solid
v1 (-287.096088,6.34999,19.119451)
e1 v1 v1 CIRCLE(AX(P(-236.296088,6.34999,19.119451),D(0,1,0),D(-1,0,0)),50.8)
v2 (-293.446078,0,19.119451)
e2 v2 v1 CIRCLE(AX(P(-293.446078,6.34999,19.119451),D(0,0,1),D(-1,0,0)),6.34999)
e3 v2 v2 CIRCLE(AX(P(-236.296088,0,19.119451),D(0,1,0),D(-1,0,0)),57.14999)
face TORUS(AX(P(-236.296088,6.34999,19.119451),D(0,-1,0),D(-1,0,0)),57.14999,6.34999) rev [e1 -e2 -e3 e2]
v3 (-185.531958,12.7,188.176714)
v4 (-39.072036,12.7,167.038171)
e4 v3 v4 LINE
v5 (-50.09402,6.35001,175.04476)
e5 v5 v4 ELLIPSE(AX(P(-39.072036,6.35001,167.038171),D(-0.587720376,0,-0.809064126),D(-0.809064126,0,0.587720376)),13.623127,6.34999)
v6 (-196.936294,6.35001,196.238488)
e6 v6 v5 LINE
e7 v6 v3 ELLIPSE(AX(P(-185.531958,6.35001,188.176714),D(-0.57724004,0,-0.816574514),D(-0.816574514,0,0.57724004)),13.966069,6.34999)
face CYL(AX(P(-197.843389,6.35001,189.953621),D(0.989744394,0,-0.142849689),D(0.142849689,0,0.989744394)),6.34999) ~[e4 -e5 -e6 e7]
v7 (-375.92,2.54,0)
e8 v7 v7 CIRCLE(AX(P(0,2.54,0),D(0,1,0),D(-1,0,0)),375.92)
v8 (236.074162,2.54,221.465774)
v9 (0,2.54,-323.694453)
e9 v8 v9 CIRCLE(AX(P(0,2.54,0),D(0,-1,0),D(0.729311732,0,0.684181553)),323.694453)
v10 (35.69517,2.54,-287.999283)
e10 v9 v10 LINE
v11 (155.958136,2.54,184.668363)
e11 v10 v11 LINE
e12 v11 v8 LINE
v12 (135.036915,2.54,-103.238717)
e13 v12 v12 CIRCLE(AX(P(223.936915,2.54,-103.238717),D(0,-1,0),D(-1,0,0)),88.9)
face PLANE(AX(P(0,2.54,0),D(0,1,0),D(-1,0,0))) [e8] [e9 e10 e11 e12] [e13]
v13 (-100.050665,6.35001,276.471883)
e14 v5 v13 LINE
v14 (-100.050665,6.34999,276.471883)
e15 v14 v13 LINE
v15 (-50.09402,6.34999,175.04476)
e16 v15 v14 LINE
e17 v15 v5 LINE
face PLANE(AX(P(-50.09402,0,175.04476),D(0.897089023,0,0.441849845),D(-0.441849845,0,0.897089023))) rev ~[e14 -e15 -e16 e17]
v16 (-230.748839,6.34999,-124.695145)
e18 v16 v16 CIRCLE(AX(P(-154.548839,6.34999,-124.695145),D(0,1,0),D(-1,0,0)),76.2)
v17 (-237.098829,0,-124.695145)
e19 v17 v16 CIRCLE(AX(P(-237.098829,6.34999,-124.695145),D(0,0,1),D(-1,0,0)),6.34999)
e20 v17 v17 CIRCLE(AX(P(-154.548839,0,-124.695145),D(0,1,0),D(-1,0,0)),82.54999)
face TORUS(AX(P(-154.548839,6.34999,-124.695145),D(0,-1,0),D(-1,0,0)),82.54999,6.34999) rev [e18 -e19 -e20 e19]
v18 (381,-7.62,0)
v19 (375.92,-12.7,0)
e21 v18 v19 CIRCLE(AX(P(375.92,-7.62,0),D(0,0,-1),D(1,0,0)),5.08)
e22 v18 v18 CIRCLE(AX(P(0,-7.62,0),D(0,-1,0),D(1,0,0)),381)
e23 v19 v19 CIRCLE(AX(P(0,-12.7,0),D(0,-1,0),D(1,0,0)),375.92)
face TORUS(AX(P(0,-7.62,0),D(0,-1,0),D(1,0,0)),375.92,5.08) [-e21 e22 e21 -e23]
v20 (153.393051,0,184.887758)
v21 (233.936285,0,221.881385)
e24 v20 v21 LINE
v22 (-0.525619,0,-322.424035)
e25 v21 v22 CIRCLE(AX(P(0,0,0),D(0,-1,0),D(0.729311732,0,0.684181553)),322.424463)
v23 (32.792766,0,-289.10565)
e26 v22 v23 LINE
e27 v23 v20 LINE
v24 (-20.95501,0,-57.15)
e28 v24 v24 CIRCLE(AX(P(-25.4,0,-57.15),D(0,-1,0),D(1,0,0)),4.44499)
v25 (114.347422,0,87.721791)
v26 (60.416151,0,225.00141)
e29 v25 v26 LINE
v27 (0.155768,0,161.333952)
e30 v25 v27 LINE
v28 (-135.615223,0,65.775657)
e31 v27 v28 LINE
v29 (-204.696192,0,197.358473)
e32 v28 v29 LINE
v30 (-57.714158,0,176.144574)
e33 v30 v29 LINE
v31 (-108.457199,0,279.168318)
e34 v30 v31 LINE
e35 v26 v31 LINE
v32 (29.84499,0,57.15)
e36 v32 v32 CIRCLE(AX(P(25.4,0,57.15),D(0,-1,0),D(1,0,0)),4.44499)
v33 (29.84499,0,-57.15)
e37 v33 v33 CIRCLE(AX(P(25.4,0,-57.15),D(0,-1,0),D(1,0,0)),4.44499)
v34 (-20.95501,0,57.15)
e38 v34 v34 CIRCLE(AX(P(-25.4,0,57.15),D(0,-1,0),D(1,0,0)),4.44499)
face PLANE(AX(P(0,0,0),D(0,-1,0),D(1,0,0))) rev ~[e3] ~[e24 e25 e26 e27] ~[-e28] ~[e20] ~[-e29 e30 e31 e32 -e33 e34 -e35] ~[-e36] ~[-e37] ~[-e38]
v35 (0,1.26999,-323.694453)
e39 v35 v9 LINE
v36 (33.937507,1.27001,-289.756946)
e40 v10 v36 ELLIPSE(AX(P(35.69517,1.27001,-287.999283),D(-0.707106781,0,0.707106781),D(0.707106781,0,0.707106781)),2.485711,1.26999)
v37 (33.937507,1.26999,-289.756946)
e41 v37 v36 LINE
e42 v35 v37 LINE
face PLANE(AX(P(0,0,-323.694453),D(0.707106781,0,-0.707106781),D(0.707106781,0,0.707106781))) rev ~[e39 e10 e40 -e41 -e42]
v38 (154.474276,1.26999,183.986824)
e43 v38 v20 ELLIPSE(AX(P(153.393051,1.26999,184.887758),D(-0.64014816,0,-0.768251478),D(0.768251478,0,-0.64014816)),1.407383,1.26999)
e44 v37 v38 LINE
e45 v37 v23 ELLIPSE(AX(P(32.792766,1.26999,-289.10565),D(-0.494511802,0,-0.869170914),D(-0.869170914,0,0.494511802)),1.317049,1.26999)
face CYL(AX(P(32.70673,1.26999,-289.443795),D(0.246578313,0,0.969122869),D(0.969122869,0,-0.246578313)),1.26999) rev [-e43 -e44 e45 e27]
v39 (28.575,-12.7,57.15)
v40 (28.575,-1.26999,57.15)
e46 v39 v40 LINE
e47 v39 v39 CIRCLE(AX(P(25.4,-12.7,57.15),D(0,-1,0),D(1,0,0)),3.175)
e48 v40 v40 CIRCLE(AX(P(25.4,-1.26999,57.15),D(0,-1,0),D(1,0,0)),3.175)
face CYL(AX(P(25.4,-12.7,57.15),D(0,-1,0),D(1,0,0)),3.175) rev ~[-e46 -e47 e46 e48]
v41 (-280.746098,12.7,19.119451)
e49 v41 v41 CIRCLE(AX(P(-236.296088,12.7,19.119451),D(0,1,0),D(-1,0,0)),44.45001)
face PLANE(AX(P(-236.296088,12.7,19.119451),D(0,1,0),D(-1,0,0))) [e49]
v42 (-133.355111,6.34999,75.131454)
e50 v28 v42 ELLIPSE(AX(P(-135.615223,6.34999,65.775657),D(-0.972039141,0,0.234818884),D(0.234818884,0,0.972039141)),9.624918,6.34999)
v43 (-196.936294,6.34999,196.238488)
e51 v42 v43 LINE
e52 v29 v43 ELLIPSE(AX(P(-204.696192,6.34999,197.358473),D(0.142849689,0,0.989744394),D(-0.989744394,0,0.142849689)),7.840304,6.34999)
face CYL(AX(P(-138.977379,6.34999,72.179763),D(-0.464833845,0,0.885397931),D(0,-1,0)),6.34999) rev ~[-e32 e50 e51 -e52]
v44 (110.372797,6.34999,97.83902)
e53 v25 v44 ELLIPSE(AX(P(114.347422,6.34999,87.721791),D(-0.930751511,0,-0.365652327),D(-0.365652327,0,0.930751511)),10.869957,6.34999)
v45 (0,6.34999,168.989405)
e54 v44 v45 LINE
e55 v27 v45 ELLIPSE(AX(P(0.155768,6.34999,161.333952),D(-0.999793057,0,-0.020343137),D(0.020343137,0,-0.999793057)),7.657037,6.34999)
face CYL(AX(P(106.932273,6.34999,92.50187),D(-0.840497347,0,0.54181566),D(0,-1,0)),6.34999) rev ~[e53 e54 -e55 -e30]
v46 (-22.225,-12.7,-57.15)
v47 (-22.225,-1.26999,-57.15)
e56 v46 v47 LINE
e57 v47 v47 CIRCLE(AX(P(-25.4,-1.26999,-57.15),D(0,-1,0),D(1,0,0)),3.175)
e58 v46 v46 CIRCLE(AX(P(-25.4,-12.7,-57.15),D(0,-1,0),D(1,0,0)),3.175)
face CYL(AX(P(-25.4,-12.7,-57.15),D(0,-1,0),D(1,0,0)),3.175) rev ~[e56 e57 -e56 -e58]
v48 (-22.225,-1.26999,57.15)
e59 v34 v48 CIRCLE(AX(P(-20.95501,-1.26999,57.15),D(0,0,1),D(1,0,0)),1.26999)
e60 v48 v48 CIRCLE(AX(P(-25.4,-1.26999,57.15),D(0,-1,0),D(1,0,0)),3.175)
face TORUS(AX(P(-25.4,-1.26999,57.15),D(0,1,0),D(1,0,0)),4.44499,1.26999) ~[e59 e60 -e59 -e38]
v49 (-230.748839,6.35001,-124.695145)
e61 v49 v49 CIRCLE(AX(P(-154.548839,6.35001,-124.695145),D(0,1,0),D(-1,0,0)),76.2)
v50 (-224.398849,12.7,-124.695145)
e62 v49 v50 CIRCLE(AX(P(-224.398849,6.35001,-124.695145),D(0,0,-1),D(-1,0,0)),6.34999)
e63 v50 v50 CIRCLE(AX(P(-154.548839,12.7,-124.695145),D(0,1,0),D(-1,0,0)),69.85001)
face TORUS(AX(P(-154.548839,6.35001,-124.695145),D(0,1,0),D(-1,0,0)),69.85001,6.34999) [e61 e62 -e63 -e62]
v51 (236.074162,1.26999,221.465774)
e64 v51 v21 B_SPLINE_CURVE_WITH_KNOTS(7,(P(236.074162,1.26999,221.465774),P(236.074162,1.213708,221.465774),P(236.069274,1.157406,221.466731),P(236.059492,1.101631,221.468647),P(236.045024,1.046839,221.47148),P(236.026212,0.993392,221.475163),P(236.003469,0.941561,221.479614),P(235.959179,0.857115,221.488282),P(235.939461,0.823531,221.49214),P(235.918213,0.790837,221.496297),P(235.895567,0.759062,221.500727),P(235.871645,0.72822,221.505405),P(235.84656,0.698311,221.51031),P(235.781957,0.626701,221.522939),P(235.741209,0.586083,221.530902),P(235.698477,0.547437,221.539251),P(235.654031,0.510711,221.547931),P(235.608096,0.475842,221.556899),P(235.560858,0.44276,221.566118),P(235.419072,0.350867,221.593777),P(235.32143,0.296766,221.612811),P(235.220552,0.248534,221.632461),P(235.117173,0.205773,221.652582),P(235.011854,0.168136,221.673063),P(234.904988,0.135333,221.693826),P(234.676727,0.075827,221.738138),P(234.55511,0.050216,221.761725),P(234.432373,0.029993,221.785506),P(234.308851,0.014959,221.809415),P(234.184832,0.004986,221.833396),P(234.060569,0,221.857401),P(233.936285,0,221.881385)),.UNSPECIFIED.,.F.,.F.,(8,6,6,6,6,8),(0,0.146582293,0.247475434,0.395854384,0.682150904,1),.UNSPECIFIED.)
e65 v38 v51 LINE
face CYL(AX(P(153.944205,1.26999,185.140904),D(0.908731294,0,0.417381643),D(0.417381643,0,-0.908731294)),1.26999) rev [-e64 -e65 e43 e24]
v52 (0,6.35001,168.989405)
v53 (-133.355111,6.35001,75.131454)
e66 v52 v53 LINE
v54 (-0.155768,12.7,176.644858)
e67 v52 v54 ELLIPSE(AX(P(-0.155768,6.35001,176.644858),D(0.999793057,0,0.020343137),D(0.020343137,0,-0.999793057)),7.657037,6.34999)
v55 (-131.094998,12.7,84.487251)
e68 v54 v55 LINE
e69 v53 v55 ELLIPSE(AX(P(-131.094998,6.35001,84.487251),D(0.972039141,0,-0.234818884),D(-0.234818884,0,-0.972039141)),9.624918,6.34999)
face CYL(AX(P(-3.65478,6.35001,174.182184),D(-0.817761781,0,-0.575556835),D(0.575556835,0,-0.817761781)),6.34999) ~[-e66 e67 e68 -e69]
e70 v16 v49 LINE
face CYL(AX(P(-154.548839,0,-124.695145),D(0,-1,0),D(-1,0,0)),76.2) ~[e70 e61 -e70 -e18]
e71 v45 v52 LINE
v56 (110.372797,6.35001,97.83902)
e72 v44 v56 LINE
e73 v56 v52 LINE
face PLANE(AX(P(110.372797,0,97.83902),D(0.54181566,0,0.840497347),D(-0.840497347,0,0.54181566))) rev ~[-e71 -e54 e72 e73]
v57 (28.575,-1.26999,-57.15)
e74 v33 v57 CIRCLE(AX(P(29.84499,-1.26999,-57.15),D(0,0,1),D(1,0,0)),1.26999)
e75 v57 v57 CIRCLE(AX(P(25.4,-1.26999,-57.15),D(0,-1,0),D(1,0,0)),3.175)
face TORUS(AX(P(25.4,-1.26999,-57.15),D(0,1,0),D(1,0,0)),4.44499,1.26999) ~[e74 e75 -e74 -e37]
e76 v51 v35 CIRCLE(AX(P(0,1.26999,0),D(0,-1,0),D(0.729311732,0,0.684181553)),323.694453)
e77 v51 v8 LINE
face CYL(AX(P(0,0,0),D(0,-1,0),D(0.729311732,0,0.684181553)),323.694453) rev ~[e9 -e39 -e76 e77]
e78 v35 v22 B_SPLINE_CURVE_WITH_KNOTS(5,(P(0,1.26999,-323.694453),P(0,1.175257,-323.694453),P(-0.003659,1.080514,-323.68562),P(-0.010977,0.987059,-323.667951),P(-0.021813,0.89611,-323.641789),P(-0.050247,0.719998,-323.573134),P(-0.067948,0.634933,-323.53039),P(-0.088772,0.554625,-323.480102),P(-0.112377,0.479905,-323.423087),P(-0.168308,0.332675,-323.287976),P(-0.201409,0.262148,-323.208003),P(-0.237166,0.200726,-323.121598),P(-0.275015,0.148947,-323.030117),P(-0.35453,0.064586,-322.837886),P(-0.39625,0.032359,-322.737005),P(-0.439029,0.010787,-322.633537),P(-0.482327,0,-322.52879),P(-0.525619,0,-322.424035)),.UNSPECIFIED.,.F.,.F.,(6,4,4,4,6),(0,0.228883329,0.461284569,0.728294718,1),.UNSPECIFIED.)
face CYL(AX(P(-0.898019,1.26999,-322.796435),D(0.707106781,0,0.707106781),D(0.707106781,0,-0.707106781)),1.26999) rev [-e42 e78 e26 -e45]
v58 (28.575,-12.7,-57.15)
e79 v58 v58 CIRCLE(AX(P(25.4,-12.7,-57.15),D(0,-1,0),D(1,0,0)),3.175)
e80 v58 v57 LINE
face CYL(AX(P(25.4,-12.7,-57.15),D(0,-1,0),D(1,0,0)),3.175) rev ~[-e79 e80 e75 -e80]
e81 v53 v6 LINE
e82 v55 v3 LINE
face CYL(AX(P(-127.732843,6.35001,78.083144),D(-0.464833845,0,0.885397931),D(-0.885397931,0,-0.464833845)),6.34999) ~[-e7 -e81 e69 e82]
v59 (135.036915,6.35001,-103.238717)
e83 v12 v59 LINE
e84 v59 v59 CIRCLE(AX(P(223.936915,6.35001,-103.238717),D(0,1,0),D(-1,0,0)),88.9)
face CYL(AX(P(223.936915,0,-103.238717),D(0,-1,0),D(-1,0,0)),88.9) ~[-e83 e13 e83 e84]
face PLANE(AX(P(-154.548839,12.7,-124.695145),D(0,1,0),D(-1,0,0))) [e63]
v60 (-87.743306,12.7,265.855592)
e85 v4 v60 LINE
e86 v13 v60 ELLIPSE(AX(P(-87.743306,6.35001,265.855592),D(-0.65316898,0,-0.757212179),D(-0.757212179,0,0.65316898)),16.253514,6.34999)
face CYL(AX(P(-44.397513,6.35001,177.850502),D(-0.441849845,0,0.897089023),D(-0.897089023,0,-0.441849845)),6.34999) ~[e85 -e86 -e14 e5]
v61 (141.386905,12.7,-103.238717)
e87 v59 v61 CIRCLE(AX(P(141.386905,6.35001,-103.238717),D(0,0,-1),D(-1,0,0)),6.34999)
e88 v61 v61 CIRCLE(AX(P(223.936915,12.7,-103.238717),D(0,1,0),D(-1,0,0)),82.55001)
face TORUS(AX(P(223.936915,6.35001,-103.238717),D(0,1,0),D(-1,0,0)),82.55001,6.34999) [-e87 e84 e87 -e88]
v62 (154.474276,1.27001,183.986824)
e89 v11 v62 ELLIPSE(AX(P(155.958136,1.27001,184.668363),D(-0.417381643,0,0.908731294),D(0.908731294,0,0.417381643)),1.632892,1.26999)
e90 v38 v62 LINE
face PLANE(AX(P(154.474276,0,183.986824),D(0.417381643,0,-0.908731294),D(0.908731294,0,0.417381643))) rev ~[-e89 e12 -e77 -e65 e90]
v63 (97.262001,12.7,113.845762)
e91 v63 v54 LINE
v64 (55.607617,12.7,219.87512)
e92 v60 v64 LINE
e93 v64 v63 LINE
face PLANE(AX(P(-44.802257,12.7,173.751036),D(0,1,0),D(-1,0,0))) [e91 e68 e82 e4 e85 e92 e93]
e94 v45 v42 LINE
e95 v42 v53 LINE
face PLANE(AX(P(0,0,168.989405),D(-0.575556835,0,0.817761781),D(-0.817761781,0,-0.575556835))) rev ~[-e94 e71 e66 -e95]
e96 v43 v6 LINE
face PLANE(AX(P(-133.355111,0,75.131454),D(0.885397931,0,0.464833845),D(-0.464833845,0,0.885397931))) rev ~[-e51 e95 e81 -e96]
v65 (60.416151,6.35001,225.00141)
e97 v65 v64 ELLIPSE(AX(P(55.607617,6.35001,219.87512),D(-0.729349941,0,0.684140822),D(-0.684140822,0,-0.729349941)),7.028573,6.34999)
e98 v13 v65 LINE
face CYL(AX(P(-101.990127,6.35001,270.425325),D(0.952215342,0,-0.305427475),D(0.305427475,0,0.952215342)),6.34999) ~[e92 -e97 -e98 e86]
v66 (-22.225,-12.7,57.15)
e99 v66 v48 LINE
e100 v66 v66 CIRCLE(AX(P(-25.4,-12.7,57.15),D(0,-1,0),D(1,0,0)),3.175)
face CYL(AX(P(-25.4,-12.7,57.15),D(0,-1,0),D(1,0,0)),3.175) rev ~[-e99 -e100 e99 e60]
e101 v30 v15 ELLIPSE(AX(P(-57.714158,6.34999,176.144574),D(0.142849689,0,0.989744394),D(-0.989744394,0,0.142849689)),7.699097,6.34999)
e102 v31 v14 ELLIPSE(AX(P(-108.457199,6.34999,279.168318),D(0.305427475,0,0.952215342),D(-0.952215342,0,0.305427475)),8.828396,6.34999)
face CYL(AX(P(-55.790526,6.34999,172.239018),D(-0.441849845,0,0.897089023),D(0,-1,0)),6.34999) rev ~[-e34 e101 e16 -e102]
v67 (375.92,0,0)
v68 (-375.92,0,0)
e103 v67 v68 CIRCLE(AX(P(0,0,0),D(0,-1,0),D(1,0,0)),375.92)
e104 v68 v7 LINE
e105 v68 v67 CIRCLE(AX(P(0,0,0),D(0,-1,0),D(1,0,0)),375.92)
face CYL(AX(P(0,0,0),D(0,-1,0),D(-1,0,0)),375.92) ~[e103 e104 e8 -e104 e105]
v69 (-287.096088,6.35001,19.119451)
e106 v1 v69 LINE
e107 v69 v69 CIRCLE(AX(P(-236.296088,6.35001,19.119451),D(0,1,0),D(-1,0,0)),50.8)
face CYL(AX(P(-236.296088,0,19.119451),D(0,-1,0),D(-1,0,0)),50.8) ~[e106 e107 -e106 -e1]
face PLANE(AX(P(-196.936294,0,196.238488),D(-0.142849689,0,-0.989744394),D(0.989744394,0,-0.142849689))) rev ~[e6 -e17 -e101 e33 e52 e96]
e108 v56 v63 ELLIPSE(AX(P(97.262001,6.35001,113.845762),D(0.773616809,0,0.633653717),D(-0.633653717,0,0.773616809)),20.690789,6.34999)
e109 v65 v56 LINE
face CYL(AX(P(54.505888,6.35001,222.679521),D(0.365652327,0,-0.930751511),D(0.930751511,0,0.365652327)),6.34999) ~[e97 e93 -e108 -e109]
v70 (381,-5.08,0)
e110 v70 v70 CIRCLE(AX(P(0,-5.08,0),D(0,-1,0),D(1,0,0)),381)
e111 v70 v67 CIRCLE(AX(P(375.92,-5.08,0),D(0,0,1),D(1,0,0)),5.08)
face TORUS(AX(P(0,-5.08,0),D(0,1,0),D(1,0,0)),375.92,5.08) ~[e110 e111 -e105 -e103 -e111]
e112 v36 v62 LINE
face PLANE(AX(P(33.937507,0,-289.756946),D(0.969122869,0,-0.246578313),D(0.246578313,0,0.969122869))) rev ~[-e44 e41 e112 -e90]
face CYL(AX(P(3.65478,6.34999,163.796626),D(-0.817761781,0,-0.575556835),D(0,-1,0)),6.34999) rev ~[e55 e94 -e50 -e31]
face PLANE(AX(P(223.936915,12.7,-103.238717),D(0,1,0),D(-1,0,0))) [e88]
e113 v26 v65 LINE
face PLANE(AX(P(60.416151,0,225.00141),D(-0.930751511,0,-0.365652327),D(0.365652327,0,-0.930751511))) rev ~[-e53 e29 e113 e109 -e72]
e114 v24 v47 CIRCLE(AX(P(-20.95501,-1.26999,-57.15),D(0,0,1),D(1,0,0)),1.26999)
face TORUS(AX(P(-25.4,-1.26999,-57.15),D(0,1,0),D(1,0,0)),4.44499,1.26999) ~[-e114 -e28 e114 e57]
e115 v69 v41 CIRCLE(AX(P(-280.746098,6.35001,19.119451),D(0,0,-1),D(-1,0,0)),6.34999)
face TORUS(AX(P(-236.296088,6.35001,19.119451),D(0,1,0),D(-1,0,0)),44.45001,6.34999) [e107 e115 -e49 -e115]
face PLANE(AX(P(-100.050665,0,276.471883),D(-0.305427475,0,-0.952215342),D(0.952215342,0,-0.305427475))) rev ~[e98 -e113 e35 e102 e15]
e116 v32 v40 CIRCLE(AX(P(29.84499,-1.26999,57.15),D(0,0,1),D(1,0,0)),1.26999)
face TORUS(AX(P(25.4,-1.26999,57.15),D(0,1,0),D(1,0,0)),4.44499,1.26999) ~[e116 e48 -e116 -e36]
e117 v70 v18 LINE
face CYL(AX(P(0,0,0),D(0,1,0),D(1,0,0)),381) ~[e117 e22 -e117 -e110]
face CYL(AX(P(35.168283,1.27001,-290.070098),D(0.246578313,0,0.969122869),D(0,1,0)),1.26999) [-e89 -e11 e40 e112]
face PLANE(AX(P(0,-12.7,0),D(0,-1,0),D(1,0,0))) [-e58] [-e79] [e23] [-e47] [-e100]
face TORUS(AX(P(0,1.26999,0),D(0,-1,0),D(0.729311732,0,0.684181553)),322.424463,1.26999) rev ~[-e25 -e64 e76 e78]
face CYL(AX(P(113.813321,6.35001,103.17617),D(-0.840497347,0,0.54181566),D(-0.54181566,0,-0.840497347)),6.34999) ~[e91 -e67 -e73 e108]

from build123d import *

# Parameters (mm, degrees)
F0_R     = 381
F1_DEPTH = 12.7
F2_R     = 5.08
F3_R     = 3.175
F4_DEPTH = 12.7
F5_R     = 375.92
F6_DEPTH = 2.54
F7_R     = 1.26999
F8_R     = 88.9
F8_R_2   = 50.8
F8_R_3   = 76.2
F9_DEPTH = 12.7
F10_R    = 6.34999


# Not quite as in the source:
# - a fillet or chamfer is up to 0.001 mm smaller than in the source, because OpenCascade refuses the exact size


with BuildPart() as f1:
    # F0 (on Front) → F1 (new body)
    with BuildSketch(Plane.XZ):
        Circle(F0_R)
    extrude(amount=F1_DEPTH)

    # F2
    f2_edges = [f1.edges().sort_by_distance(p)[0] for p in [
        (-381, -12.7, 0),
        (-381, 0, 0),
    ]]
    fillet(f2_edges, radius=F2_R)

    # F3 (on face) → F4 (cut)
    with BuildSketch(Plane.XZ.offset(12.7)):
        with Locations((-25.4, 57.15)):
            Circle(F3_R)
        with Locations((25.4, 57.15)):
            Circle(F3_R)
        with Locations((-25.4, -57.15)):
            Circle(F3_R)
        with Locations((25.4, -57.15)):
            Circle(F3_R)
    extrude(amount=-F4_DEPTH, mode=Mode.SUBTRACT)

    # F5 (on face) → F6 (join)
    with BuildSketch(Plane(origin=(0, 0, 0), x_dir=(-1, 0, 0), z_dir=(0, 1, 0))):
        Circle(F5_R)
        with BuildLine():
            ThreePointArc((13.8301810917, 323.3988637204), (233.7251076258, 223.943459449), (323.6944530953, 0))
            ThreePointArc((323.6944530953, 0), (228.8865428162, -228.8865428162), (0, -323.6944530953))
            ThreePointArc((0, -323.6944530953), (-297.0398470602, -128.6290333601), (-236.0741621082, 221.4657737656))
            ThreePointArc((-236.0741621082, 221.4657737656), (-122.2525479548, 299.7205589933), (13.8301810917, 323.3988637204))
        make_face(mode=Mode.SUBTRACT)
        Polygon((-154.4742758485, 183.9868239484), (-236.0741621082, 221.4657737656), (-282.388240099, -93.3703109622), (-140.2126329417, -183.4818201537), (-33.9375066037, -289.7569464917), align=None)
        with BuildLine():
            ThreePointArc((-236.0741621082, 221.4657737656), (-297.0398470602, -128.6290333601), (0, -323.6944530953))
            Line((0, -323.6944530953), (-33.9375066037, -289.7569464917))
            Line((-33.9375066037, -289.7569464917), (-140.2126329417, -183.4818201537))
            Line((-140.2126329417, -183.4818201537), (-282.388240099, -93.3703109622))
            Line((-282.388240099, -93.3703109622), (-236.0741621082, 221.4657737656))
        make_face()
    extrude(amount=F6_DEPTH)

    # F7 (radius 1.27 in the source; OpenCascade refuses exactly that, so slightly less here)
    f7_edges = [f1.edges().sort_by_distance(p)[0] for p in [
        (94.205891, 2.54, -52.885061),
        (-297.039847, 0, 128.629033),
        (195.274219, 0, 202.726299),
        (94.205891, 0, -52.885061),
        (16.968753, 0, -306.7257),
        (-28.575, 0, -57.15),
        (22.225, 0, -57.15),
        (-28.575, 0, 57.15),
        (22.225, 0, 57.15),
    ]]
    fillet(f7_edges, radius=F7_R)

    # F8 (on face) → F9 (join)
    with BuildSketch(Plane(origin=(0, 0, 0), x_dir=(-1, 0, 0), z_dir=(0, 1, 0))):
        with Locations((-223.9369153976, -103.2387167215)):
            Circle(F8_R)
        with Locations((236.2960875034, 19.1194508225)):
            Circle(F8_R_2)
        with Locations((154.5488387346, -124.6951445937)):
            Circle(F8_R_3)
        Polygon((100.0506654382, 276.4718830585), (-60.4161508381, 225.0014096498), (-110.3727966547, 97.8390201926), (0, 168.989405036), (133.3551108837, 75.1314535737), (196.9362944365, 196.2384879589), (50.0940196216, 175.044760108), align=None)
    extrude(amount=F9_DEPTH)

    # F10 (radius 6.35 in the source; OpenCascade refuses exactly that, so slightly less here)
    f10_edges = [f1.edges().sort_by_distance(p)[0] for p in [
        (-66.677555, 12.7, 122.060429),
        (-165.145703, 12.7, 135.684971),
        (55.186398, 12.7, 133.414213),
        (85.394474, 12.7, 161.420215),
        (-165.145703, 0, 135.684971),
        (-66.677555, 0, 122.060429),
        (55.186398, 0, 133.414213),
        (-75.072343, 12.7, 225.758322),
        (-123.515157, 12.7, 185.641624),
        (-19.817257, 12.7, 250.736646),
        (-75.072343, 0, 225.758322),
        (-185.496088, 0, 19.119451),
        (-185.496088, 12.7, 19.119451),
        (-78.348839, 12.7, -124.695145),
        (-78.348839, 0, -124.695145),
        (312.836915, 12.7, -103.238717),
    ]]
    fillet(f10_edges, radius=F10_R)


solid = f1.part
